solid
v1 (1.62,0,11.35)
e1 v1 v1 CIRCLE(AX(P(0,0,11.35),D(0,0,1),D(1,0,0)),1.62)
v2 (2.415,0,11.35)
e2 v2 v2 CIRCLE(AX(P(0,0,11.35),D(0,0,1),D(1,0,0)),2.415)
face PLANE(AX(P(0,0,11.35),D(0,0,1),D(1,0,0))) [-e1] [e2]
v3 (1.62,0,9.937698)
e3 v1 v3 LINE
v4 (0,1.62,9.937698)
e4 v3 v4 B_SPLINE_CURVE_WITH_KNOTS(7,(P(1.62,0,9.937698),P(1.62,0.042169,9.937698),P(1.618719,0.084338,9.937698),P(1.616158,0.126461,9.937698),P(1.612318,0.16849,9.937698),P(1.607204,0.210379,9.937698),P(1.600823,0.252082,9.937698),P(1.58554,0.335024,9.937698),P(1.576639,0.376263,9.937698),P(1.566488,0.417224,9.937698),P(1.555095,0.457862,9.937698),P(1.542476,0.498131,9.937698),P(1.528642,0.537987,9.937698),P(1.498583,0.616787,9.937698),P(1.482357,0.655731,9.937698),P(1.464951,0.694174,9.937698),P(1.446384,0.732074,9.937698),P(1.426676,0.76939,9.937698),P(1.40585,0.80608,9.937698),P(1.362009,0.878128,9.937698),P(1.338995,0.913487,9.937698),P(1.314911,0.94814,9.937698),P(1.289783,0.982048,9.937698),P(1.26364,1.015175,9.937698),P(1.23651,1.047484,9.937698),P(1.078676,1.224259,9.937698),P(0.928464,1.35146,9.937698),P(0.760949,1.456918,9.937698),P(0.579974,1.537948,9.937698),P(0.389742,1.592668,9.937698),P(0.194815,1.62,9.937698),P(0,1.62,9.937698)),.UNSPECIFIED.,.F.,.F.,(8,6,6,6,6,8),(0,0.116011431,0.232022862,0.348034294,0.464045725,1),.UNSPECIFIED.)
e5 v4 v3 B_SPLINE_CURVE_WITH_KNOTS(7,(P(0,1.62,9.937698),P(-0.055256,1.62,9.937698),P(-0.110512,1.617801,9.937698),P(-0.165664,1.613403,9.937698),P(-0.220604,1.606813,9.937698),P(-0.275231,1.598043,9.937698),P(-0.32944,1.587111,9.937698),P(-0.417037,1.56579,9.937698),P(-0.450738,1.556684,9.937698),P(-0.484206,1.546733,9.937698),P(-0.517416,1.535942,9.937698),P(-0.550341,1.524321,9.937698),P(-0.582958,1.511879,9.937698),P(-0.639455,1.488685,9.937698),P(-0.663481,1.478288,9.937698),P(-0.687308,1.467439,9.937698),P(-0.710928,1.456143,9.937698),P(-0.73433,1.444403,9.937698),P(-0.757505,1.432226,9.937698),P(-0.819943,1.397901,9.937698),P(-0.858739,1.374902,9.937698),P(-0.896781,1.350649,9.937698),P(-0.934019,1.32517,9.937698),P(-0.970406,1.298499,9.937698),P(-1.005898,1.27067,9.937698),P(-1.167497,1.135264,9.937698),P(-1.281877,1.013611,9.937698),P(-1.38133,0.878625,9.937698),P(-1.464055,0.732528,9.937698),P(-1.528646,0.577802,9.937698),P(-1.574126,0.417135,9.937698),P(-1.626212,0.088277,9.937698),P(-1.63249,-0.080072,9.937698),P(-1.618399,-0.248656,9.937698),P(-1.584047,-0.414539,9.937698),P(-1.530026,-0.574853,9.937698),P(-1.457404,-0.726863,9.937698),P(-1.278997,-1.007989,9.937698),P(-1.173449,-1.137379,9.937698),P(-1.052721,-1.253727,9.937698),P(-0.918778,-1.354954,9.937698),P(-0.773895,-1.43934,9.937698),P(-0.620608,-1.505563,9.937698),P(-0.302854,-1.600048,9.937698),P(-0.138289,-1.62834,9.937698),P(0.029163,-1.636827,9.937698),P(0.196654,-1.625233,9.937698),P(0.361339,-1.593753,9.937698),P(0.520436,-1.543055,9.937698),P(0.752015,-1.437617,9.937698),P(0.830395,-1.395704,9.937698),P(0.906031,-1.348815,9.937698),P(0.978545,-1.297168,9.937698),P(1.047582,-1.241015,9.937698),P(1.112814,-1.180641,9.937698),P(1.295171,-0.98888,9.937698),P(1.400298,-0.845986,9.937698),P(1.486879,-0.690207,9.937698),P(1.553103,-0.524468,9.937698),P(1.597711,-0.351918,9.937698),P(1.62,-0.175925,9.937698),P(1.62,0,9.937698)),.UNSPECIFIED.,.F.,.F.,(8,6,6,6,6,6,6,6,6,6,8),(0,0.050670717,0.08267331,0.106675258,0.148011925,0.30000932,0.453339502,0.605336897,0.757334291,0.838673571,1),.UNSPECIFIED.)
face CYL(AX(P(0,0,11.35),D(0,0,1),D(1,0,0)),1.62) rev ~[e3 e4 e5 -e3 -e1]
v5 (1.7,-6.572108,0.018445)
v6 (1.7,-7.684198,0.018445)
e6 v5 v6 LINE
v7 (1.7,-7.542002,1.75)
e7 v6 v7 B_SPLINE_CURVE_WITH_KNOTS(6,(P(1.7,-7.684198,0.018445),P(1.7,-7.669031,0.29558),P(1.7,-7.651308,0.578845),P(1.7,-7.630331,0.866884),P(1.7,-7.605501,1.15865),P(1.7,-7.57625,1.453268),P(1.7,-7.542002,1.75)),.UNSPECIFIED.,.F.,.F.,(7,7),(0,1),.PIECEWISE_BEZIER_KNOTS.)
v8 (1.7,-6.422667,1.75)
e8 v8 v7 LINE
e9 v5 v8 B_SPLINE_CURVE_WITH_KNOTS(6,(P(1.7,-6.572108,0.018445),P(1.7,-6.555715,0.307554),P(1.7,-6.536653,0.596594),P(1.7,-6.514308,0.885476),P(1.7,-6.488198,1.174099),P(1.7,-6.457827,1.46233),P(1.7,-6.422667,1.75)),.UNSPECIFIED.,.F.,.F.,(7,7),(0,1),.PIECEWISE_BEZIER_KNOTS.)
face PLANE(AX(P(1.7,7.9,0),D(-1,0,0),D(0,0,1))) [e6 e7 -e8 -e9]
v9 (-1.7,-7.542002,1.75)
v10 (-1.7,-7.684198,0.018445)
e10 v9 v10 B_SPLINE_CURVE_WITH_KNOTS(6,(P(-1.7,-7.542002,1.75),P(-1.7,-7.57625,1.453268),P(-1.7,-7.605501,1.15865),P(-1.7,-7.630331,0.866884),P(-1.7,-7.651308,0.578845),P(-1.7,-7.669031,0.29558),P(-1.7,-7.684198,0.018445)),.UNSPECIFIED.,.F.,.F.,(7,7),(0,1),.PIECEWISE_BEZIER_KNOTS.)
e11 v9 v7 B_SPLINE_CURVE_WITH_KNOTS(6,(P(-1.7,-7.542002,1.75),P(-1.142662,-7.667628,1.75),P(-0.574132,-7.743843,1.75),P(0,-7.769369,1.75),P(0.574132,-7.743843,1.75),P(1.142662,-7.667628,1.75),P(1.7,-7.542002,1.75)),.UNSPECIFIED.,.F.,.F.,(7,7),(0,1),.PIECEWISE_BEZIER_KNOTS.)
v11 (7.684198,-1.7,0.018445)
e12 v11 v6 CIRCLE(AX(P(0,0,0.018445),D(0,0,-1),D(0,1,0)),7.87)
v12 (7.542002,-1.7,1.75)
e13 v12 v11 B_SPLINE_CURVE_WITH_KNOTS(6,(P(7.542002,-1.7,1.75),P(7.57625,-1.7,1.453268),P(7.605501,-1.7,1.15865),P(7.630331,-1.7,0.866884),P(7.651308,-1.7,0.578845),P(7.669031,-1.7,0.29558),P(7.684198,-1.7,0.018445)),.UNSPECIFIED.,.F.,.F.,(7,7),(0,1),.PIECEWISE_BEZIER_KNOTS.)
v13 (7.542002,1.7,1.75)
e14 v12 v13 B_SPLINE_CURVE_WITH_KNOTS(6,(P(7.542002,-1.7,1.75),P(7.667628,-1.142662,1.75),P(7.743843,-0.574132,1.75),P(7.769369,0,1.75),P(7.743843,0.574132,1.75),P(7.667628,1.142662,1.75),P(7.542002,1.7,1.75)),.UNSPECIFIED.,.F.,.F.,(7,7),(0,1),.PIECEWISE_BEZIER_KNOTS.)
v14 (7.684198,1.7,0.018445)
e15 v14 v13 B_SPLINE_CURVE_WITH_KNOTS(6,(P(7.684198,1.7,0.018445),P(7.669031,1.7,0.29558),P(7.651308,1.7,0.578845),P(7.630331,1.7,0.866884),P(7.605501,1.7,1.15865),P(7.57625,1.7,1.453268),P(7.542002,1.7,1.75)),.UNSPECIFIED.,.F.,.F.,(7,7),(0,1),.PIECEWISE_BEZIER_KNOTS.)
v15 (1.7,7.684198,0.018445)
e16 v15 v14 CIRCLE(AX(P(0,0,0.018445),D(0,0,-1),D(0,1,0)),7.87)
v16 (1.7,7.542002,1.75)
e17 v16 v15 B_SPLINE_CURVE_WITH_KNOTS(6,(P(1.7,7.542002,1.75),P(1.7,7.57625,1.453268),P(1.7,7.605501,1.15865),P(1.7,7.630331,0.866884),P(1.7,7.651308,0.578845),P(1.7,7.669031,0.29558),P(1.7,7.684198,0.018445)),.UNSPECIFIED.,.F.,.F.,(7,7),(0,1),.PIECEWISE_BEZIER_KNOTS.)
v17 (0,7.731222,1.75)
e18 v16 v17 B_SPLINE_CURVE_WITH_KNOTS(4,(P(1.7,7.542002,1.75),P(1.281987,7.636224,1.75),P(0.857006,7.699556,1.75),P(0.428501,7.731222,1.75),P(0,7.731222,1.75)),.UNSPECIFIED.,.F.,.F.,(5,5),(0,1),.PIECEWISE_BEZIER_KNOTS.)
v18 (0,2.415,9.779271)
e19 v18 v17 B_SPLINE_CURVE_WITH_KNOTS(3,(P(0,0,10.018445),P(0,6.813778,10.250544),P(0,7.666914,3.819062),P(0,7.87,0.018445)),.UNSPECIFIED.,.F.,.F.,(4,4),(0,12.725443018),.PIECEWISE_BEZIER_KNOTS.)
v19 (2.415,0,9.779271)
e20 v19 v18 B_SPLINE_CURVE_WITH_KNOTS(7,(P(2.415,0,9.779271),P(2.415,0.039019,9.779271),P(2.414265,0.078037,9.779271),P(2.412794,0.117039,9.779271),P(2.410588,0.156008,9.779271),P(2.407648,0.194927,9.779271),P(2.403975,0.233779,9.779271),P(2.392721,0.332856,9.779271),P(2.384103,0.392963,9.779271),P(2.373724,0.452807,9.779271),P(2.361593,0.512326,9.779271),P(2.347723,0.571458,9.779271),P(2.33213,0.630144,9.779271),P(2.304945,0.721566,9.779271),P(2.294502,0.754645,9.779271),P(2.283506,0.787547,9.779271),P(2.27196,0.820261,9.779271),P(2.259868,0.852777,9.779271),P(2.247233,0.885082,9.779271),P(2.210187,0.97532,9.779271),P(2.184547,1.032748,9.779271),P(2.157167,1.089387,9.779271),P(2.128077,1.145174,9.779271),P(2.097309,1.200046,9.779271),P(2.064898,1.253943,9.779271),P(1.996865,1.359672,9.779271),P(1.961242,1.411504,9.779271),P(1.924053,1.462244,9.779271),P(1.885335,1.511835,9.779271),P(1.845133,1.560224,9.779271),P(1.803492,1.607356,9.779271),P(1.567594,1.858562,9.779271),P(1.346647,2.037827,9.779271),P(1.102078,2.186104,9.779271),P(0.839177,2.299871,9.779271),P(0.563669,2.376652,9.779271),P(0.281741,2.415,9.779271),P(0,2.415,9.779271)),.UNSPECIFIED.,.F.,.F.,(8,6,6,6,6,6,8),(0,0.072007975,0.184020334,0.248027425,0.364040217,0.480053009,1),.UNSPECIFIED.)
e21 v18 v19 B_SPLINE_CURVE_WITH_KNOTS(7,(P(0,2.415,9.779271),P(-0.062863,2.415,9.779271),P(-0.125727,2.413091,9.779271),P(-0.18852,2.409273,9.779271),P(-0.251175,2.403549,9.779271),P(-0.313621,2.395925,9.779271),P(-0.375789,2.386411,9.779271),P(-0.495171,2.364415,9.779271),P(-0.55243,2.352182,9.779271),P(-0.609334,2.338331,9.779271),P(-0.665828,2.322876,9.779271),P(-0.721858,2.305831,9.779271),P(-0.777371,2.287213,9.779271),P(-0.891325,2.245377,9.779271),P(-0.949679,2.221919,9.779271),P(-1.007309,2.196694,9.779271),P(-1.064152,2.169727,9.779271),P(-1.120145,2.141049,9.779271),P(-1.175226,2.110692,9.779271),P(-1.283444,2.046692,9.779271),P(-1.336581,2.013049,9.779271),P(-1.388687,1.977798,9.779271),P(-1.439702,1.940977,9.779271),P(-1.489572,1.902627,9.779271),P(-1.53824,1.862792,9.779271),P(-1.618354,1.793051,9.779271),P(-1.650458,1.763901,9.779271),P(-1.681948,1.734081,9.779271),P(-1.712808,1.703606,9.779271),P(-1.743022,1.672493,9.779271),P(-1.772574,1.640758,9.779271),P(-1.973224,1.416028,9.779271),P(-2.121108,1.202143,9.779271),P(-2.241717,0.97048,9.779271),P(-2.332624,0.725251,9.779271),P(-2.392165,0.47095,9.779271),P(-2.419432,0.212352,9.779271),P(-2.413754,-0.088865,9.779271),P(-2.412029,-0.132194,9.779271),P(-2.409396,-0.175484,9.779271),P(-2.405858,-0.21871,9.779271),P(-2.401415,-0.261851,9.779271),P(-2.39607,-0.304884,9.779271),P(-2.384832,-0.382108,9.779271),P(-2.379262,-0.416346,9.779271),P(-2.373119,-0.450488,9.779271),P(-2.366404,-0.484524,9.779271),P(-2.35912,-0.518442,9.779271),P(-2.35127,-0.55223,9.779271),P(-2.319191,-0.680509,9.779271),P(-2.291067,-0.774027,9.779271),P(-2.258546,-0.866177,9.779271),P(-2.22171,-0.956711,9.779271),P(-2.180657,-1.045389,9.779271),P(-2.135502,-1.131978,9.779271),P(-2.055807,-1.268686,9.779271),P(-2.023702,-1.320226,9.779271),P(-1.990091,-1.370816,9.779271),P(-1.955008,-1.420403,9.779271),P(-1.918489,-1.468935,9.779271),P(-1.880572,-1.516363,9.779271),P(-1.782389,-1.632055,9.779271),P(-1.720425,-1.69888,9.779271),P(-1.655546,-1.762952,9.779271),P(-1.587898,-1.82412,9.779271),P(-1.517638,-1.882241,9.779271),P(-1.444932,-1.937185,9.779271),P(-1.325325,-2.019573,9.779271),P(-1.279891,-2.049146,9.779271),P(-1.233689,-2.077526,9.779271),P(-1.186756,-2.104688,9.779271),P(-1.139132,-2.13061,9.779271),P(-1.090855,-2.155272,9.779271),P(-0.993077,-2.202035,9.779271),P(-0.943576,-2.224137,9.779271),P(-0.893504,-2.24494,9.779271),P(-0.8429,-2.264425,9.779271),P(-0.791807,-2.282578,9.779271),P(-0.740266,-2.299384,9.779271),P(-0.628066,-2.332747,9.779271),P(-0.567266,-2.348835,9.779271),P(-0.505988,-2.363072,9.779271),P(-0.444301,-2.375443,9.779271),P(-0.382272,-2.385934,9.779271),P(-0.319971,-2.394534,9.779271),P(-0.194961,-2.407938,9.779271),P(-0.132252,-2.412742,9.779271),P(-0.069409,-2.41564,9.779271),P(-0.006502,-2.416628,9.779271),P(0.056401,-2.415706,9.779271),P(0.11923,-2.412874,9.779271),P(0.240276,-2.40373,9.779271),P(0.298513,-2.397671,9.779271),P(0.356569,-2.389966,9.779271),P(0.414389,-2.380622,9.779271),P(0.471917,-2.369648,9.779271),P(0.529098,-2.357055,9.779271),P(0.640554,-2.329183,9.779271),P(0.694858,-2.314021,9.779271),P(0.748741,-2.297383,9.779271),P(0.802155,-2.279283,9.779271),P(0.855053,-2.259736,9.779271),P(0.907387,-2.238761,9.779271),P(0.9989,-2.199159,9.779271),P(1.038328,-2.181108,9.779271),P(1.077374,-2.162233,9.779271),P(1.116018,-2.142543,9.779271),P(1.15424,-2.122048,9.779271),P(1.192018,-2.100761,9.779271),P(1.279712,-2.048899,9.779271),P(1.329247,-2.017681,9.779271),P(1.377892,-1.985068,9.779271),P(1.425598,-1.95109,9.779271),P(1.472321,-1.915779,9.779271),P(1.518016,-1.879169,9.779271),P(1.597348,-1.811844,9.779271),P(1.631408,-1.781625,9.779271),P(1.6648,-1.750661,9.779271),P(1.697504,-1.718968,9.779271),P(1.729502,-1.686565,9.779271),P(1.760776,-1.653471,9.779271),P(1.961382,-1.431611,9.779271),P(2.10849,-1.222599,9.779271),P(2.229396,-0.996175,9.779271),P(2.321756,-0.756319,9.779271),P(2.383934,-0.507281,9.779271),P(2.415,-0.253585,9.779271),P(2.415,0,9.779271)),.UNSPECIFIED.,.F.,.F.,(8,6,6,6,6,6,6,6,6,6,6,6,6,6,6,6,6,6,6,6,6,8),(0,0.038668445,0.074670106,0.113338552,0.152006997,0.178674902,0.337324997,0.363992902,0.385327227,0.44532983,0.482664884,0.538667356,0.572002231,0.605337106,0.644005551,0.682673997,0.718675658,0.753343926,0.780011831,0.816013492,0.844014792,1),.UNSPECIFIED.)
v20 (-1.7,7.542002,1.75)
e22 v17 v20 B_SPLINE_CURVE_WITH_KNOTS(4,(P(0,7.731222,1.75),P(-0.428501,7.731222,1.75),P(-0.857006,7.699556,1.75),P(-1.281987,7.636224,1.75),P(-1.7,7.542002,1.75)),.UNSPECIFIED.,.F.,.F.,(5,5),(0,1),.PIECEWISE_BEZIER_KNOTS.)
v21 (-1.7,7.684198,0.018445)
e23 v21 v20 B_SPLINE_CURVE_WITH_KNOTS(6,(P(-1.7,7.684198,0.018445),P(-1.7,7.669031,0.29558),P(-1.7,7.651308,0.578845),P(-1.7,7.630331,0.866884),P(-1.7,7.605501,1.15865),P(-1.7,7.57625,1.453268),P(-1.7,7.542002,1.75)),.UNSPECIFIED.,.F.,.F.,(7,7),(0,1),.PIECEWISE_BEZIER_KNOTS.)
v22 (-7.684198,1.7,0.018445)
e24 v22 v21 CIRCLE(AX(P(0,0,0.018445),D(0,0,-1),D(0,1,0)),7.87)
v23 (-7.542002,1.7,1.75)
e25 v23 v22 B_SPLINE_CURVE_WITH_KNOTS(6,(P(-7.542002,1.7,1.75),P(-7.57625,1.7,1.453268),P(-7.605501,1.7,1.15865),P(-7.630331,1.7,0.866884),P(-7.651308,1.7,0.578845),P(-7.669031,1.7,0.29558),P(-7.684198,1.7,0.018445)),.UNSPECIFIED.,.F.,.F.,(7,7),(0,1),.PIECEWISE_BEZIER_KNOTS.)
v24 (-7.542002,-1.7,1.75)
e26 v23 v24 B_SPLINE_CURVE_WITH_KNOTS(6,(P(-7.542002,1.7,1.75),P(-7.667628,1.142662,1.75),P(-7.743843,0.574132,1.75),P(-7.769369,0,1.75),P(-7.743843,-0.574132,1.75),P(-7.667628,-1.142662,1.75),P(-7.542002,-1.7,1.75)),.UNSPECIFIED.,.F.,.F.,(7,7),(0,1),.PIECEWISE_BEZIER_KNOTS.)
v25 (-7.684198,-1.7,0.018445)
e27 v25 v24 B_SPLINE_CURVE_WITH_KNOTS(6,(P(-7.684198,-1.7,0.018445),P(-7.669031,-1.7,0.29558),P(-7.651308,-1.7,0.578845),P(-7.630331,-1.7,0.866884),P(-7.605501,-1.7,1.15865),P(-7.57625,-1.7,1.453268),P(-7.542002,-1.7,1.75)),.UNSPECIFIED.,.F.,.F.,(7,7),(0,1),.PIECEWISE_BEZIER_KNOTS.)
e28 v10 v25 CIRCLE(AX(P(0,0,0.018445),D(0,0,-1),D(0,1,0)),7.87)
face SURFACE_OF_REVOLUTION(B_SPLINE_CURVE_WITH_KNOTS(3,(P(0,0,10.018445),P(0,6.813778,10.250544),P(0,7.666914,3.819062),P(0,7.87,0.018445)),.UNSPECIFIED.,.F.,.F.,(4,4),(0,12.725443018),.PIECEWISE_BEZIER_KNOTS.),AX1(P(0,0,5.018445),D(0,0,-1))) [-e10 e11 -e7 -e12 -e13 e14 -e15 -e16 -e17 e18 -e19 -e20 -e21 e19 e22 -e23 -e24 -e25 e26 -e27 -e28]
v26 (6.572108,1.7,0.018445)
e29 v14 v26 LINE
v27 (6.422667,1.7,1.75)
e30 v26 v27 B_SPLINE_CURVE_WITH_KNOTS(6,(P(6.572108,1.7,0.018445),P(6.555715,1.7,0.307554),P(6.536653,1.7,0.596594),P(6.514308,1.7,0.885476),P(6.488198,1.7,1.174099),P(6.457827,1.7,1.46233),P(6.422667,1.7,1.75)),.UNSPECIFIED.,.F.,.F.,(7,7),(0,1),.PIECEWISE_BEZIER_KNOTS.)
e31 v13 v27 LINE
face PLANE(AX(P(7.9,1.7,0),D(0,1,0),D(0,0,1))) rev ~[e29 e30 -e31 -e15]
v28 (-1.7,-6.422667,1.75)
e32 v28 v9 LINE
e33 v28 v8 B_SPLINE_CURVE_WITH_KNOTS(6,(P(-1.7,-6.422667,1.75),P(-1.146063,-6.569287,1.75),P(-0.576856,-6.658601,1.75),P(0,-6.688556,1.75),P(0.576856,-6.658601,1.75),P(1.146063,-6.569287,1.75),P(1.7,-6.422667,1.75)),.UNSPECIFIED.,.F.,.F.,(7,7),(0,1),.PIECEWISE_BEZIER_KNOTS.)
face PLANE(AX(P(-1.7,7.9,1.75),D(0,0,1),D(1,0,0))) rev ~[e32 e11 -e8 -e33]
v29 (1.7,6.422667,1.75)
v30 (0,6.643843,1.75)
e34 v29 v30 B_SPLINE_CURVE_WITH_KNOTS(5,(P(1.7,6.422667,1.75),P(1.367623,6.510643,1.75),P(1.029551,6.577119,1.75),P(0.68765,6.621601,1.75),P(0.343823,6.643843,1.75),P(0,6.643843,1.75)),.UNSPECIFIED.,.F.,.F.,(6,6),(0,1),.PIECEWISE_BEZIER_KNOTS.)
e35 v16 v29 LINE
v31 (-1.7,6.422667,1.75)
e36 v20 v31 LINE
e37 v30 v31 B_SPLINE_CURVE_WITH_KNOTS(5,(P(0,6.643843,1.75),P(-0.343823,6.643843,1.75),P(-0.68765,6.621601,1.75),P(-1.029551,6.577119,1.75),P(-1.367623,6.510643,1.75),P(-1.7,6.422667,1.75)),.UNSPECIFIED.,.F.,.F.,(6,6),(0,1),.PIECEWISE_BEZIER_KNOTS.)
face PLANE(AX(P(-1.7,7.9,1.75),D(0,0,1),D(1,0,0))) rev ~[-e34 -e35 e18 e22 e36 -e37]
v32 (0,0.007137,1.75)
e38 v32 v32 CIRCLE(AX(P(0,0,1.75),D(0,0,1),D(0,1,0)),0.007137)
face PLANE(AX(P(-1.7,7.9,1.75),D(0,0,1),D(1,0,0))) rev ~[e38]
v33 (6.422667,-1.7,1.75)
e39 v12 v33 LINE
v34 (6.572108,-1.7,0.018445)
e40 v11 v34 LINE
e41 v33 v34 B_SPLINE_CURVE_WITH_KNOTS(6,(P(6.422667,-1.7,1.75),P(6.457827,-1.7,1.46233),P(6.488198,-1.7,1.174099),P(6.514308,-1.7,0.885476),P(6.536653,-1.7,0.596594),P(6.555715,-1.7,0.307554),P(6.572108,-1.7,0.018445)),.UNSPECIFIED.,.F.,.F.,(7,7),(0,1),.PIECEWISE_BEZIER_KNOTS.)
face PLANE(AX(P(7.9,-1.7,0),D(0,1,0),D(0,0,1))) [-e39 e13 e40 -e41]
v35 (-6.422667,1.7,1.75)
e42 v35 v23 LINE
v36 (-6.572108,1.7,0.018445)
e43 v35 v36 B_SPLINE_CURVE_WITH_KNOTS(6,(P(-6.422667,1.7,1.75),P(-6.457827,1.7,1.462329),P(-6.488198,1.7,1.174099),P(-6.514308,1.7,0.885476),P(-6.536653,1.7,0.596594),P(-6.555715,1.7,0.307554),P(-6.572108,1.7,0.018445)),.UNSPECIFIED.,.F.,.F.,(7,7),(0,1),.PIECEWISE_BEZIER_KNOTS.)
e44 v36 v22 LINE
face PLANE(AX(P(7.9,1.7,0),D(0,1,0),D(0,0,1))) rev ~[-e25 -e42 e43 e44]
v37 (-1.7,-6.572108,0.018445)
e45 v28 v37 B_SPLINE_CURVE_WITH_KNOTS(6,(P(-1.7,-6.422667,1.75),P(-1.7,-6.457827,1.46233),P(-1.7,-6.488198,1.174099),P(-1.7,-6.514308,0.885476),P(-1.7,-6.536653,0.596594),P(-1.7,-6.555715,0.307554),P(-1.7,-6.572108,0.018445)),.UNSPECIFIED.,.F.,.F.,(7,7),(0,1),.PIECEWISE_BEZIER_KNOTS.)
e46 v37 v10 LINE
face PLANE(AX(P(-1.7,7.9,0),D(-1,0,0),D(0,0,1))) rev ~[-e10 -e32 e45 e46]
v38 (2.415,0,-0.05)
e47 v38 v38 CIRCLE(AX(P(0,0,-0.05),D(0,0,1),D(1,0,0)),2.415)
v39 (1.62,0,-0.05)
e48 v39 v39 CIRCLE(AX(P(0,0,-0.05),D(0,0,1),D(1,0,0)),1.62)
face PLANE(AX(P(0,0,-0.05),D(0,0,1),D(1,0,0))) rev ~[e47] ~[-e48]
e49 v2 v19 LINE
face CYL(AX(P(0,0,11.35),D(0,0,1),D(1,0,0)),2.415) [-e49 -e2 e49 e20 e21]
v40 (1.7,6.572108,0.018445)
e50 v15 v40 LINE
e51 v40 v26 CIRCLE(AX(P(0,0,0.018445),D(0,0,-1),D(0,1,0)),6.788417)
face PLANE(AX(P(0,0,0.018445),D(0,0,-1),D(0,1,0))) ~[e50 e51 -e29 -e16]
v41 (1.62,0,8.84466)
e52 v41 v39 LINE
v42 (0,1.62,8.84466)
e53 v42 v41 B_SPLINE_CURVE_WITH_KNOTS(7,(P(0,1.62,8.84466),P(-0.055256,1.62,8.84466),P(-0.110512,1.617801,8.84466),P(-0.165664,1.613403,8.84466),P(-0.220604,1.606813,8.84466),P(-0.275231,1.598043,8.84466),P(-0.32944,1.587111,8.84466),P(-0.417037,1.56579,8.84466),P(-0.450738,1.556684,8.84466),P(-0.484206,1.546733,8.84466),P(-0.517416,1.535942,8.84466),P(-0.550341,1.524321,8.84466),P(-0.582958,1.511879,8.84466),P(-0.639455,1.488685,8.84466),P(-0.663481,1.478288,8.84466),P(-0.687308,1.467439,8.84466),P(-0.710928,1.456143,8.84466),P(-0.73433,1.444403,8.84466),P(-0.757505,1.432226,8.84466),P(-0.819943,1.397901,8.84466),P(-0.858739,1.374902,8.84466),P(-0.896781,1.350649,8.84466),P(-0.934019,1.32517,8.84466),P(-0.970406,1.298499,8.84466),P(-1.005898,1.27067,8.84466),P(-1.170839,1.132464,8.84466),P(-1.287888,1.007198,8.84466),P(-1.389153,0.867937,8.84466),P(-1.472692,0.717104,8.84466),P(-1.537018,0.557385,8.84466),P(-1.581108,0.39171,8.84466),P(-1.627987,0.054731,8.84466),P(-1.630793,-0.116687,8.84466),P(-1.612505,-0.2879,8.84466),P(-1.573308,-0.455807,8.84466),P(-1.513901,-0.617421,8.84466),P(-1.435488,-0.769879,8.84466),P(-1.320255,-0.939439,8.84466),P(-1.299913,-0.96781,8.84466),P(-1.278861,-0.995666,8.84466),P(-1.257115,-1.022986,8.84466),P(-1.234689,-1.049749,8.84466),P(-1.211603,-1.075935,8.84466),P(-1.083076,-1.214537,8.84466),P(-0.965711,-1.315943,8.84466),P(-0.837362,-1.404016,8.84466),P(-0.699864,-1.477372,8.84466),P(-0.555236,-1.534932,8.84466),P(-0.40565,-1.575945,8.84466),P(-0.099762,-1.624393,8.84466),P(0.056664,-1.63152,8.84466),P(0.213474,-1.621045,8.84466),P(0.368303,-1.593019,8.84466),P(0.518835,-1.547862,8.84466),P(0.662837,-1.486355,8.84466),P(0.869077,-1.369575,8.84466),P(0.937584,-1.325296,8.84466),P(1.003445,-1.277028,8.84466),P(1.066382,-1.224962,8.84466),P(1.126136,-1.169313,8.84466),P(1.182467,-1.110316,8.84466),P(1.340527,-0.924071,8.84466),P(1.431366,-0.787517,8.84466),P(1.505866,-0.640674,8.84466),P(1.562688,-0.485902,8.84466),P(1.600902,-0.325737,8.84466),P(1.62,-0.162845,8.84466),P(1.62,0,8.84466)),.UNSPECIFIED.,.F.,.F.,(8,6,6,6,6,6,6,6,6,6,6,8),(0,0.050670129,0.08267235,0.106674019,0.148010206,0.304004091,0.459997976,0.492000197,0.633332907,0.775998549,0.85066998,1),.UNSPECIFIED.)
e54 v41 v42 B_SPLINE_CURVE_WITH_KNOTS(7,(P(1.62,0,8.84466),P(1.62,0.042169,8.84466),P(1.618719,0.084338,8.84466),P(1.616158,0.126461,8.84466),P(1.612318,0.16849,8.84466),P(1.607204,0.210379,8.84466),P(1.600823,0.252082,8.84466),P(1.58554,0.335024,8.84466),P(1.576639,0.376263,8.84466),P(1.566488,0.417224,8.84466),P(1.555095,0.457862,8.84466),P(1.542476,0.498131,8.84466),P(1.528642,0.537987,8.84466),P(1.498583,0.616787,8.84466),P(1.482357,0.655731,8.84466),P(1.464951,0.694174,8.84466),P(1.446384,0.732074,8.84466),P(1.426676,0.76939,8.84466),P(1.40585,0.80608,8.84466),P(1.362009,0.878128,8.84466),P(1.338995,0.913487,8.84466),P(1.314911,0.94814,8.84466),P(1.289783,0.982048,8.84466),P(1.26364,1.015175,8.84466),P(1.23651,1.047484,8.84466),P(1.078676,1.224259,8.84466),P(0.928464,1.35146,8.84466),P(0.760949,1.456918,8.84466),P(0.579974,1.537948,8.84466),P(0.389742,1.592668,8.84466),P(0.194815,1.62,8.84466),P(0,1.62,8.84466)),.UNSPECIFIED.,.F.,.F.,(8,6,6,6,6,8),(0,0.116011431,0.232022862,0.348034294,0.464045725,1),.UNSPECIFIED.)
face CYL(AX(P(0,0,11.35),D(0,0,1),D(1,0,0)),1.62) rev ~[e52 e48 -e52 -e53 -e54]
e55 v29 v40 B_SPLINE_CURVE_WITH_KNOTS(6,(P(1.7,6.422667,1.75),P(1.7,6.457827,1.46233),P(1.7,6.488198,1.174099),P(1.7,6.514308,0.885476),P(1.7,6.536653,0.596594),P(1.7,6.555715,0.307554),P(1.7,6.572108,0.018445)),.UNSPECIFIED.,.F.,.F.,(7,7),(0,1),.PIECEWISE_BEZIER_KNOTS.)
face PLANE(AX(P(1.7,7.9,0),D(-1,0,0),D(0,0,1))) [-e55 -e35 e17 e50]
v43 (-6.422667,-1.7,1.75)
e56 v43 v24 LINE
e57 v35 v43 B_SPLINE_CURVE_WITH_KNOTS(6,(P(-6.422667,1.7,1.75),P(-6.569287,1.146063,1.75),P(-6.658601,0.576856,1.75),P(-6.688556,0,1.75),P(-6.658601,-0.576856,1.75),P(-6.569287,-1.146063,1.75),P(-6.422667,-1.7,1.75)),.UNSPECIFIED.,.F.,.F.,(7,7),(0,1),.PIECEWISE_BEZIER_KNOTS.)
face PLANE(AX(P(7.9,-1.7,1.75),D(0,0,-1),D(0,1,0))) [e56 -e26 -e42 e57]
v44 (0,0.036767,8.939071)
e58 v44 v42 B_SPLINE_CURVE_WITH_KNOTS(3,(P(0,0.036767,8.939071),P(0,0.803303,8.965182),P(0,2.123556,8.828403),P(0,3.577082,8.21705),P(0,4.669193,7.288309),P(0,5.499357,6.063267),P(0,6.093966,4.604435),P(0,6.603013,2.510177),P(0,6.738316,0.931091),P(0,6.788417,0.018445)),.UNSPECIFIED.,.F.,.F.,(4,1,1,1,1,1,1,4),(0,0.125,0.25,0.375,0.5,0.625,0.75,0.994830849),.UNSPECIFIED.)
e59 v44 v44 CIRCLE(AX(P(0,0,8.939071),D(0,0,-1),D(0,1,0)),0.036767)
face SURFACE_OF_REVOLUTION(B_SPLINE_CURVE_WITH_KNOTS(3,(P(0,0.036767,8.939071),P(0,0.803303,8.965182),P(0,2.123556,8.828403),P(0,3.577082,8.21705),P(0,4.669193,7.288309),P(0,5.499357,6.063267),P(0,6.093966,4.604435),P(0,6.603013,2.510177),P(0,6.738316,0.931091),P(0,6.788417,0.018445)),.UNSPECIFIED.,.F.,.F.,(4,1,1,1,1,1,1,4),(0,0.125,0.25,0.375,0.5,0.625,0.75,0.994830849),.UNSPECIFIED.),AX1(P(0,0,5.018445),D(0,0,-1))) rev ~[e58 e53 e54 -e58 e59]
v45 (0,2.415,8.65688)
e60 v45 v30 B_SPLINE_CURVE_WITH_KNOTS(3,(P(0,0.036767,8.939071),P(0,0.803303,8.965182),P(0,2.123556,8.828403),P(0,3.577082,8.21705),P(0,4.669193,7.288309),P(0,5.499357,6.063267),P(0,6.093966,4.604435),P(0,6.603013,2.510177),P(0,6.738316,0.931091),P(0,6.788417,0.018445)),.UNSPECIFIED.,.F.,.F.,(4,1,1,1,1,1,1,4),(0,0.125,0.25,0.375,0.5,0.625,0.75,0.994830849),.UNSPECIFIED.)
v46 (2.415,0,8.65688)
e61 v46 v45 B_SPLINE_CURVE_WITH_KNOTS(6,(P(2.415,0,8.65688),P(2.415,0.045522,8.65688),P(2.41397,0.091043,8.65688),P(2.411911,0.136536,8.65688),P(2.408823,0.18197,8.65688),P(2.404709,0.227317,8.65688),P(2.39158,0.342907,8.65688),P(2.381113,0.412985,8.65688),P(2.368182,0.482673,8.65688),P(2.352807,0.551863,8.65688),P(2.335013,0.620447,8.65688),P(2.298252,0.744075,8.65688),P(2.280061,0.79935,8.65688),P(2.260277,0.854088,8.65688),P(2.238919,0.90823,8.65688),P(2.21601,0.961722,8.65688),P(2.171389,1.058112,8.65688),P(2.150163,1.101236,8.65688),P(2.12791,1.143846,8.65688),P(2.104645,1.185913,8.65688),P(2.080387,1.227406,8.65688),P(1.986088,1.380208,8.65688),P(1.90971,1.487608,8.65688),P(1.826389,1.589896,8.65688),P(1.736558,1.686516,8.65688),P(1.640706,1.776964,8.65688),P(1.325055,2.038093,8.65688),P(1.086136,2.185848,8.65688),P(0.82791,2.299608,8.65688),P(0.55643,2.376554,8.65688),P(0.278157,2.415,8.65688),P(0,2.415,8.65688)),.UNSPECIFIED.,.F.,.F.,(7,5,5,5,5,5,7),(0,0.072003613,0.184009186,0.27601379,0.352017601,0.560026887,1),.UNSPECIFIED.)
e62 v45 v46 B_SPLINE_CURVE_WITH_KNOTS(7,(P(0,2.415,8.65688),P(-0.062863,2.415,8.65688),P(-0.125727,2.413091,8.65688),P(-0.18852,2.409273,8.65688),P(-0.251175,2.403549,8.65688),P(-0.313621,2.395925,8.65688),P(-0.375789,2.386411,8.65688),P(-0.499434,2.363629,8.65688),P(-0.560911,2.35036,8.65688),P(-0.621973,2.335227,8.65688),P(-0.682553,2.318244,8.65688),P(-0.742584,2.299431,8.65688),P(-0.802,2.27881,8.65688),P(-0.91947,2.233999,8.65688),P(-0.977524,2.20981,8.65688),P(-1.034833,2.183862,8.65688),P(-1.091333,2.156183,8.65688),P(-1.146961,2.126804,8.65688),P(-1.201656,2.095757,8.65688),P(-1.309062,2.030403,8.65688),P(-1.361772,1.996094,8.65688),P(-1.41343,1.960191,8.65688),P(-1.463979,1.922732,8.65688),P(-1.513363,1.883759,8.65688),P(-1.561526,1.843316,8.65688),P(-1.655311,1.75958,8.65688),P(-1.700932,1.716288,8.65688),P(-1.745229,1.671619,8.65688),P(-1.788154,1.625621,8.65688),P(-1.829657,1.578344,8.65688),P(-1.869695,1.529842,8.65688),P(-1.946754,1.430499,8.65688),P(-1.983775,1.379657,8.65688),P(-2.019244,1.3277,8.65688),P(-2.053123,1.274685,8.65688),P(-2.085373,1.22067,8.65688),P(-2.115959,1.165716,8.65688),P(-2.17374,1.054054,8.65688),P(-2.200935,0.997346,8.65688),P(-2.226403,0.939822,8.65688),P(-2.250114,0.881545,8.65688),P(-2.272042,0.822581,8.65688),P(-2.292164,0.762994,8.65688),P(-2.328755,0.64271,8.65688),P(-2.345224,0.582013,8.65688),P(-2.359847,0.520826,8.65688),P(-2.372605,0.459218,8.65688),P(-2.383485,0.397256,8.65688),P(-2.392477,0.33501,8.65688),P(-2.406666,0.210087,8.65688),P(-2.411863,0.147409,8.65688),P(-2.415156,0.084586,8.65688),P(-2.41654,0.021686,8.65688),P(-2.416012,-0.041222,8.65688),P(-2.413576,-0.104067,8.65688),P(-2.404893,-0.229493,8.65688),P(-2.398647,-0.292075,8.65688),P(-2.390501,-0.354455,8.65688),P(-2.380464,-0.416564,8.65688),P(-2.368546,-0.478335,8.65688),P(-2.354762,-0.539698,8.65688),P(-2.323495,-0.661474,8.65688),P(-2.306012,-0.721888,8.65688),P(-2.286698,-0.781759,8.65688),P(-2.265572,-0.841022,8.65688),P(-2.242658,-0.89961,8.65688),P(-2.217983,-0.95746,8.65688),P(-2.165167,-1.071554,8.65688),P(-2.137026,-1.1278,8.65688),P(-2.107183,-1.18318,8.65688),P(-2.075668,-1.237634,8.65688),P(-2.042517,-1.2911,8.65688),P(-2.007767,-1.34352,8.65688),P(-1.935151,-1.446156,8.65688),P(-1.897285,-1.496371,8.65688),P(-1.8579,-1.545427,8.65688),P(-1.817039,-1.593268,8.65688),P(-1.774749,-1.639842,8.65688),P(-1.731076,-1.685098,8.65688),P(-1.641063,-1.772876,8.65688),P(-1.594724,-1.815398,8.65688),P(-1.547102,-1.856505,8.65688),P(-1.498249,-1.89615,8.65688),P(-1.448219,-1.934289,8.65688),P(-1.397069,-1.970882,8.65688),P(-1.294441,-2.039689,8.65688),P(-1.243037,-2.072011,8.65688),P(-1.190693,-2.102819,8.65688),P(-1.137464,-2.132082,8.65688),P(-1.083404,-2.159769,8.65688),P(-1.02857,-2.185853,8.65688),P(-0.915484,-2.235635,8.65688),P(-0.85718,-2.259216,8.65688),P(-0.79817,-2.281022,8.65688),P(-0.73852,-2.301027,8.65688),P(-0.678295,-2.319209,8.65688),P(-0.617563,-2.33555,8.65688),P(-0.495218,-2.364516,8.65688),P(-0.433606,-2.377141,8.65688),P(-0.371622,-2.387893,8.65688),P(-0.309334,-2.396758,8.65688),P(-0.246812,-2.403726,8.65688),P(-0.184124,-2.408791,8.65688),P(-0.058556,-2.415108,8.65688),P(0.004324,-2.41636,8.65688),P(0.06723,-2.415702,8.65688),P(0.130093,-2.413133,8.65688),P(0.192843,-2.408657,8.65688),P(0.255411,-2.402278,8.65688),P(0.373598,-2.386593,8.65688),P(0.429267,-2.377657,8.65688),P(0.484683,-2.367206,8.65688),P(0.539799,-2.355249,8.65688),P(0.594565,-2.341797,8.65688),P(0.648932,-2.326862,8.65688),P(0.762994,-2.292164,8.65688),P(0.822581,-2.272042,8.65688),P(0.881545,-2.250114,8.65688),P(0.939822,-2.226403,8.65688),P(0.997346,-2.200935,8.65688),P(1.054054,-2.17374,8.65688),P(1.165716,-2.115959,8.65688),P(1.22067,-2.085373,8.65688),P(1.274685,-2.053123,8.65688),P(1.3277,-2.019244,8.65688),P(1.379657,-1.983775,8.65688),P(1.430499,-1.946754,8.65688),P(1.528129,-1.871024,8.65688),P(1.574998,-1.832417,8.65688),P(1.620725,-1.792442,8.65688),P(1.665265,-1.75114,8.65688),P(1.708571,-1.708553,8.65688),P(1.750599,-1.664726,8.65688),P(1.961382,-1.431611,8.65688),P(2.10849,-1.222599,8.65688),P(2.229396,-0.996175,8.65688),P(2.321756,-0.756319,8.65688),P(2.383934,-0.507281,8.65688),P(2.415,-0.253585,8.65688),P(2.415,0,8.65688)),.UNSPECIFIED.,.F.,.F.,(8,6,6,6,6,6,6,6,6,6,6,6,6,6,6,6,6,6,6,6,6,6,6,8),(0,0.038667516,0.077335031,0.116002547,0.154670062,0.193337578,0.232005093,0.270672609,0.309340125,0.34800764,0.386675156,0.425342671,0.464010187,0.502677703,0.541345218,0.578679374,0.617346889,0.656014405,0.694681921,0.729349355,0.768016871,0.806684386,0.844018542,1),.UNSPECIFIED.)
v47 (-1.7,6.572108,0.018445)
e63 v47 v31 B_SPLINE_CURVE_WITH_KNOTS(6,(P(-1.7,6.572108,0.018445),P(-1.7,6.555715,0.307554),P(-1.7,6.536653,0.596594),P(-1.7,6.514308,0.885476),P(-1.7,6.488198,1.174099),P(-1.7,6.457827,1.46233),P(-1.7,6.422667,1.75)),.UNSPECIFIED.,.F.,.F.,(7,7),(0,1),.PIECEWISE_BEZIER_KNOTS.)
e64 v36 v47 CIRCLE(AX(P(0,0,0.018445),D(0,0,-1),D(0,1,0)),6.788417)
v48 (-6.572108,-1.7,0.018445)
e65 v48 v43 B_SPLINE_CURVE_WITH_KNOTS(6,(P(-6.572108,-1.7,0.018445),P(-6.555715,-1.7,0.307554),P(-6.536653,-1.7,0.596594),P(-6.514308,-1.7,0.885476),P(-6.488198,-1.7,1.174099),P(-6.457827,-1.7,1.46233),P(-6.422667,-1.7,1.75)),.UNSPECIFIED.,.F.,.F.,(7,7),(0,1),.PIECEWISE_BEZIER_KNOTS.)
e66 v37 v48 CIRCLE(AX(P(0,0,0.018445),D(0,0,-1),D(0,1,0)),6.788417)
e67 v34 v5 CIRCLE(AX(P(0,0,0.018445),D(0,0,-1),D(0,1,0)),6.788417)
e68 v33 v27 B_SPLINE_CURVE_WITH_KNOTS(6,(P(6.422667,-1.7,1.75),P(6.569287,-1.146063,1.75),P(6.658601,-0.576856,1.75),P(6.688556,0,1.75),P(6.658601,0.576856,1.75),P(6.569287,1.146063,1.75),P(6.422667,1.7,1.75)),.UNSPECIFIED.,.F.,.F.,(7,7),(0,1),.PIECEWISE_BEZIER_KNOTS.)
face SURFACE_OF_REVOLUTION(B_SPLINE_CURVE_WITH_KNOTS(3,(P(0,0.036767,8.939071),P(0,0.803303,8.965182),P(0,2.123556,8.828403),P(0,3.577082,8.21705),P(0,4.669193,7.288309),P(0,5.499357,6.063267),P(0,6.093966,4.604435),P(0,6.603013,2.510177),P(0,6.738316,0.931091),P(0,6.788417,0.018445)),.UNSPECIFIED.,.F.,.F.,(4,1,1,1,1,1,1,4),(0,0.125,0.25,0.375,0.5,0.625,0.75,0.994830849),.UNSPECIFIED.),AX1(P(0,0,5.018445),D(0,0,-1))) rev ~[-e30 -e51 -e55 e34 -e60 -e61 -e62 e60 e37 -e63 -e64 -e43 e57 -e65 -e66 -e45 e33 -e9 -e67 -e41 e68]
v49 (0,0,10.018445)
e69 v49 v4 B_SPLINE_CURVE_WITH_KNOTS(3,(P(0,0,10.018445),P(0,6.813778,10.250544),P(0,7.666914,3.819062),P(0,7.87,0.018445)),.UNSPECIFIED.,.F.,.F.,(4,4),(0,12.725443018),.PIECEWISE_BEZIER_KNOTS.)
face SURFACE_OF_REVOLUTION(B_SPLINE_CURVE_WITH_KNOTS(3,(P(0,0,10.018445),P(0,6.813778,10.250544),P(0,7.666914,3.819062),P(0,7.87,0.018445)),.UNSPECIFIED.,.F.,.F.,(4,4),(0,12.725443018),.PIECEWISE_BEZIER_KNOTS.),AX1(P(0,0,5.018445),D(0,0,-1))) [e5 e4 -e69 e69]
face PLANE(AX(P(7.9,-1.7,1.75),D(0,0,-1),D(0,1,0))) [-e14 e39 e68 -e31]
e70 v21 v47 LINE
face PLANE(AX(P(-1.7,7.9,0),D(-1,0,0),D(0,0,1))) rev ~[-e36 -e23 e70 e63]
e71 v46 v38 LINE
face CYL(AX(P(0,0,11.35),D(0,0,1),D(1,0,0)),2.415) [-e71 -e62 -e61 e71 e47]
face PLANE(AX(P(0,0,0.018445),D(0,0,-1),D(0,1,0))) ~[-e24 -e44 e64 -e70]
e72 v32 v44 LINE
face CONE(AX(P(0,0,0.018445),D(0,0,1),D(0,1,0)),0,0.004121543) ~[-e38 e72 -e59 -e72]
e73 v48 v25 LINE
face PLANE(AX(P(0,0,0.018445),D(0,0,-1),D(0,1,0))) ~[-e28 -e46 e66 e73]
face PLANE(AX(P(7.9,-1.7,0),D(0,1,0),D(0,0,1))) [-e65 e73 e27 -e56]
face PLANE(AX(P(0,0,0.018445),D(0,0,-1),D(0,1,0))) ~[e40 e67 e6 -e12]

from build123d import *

# Parameters (mm, degrees)
F5_W      = 3.4
F5_H      = 1.75
F6_DEPTH  = 15.7710001
F8_W      = 3.4
F8_H      = 1.75
F9_DEPTH  = 15.7710001
F3_R      = 2.415
F3_R_2    = 1.62
F10_DEPTH = 11.4


# Not quite as in the source:
# - the dataset's text gives a spline's control points without its knots; the knots are read off the source's solid


with BuildPart() as f1:
    # F0 (on Right) → F1 (revolve)
    with BuildSketch(Plane.YZ):
        with BuildLine():
            add(Edge.make_bspline(
                [(0, 10.0184451824), (6.8137775206, 10.2505443388), (7.6669137151, 3.8190624776), (7.87, 0.0184451824)],
                knots=[0, 0, 0, 0, 12.7254430178, 12.7254430178, 12.7254430178, 12.7254430178], degree=3))
            Line((0, 10.0184451824), (0, 0.0184451824))
            Line((0, 0.0184451824), (0.0367669511, 8.9390710533))
            add(Edge.make_bspline(
                [(0.0367669511, 8.9390710533), (0.8033031519, 8.9651817393), (2.1235558491, 8.828403274), (3.5770824697, 8.2170500598), (4.6691932617, 7.288309401), (5.4993568364, 6.0632667187), (6.0939655872, 4.6044346653), (6.6030130693, 2.5101767004), (6.7383162854, 0.9310906536), (6.7884172037, 0.0184451824)],
                knots=[0, 0, 0, 0, 0.125, 0.25, 0.375, 0.5, 0.625, 0.75, 0.9948308485, 0.9948308485, 0.9948308485, 0.9948308485], degree=3))
            Line((6.7884172037, 0.0184451824), (7.87, 0.0184451824))
        make_face()
    revolve(axis=Axis((0, 0, 5.0184451824), (0, 0, -1)))

    # F5 (on offset) → F6 (cut, through all)
    with BuildSketch(Plane.XZ.offset(-7.9)):
        with Locations((0, 0.875)):
            Rectangle(F5_W, F5_H)
    extrude(amount=F6_DEPTH, mode=Mode.SUBTRACT)

    # F8 (on offset) → F9 (cut, through all)
    with BuildSketch(Plane.YZ.offset(7.9)):
        with Locations((0, 0.875)):
            Rectangle(F8_W, F8_H)
    extrude(amount=-F9_DEPTH, mode=Mode.SUBTRACT)

    # F3 (on offset) → F10 (join)
    with BuildSketch(Plane.XY.offset(11.35)):
        Circle(F3_R)
        Circle(F3_R_2, mode=Mode.SUBTRACT)
    extrude(amount=-F10_DEPTH)


solid = f1.part
